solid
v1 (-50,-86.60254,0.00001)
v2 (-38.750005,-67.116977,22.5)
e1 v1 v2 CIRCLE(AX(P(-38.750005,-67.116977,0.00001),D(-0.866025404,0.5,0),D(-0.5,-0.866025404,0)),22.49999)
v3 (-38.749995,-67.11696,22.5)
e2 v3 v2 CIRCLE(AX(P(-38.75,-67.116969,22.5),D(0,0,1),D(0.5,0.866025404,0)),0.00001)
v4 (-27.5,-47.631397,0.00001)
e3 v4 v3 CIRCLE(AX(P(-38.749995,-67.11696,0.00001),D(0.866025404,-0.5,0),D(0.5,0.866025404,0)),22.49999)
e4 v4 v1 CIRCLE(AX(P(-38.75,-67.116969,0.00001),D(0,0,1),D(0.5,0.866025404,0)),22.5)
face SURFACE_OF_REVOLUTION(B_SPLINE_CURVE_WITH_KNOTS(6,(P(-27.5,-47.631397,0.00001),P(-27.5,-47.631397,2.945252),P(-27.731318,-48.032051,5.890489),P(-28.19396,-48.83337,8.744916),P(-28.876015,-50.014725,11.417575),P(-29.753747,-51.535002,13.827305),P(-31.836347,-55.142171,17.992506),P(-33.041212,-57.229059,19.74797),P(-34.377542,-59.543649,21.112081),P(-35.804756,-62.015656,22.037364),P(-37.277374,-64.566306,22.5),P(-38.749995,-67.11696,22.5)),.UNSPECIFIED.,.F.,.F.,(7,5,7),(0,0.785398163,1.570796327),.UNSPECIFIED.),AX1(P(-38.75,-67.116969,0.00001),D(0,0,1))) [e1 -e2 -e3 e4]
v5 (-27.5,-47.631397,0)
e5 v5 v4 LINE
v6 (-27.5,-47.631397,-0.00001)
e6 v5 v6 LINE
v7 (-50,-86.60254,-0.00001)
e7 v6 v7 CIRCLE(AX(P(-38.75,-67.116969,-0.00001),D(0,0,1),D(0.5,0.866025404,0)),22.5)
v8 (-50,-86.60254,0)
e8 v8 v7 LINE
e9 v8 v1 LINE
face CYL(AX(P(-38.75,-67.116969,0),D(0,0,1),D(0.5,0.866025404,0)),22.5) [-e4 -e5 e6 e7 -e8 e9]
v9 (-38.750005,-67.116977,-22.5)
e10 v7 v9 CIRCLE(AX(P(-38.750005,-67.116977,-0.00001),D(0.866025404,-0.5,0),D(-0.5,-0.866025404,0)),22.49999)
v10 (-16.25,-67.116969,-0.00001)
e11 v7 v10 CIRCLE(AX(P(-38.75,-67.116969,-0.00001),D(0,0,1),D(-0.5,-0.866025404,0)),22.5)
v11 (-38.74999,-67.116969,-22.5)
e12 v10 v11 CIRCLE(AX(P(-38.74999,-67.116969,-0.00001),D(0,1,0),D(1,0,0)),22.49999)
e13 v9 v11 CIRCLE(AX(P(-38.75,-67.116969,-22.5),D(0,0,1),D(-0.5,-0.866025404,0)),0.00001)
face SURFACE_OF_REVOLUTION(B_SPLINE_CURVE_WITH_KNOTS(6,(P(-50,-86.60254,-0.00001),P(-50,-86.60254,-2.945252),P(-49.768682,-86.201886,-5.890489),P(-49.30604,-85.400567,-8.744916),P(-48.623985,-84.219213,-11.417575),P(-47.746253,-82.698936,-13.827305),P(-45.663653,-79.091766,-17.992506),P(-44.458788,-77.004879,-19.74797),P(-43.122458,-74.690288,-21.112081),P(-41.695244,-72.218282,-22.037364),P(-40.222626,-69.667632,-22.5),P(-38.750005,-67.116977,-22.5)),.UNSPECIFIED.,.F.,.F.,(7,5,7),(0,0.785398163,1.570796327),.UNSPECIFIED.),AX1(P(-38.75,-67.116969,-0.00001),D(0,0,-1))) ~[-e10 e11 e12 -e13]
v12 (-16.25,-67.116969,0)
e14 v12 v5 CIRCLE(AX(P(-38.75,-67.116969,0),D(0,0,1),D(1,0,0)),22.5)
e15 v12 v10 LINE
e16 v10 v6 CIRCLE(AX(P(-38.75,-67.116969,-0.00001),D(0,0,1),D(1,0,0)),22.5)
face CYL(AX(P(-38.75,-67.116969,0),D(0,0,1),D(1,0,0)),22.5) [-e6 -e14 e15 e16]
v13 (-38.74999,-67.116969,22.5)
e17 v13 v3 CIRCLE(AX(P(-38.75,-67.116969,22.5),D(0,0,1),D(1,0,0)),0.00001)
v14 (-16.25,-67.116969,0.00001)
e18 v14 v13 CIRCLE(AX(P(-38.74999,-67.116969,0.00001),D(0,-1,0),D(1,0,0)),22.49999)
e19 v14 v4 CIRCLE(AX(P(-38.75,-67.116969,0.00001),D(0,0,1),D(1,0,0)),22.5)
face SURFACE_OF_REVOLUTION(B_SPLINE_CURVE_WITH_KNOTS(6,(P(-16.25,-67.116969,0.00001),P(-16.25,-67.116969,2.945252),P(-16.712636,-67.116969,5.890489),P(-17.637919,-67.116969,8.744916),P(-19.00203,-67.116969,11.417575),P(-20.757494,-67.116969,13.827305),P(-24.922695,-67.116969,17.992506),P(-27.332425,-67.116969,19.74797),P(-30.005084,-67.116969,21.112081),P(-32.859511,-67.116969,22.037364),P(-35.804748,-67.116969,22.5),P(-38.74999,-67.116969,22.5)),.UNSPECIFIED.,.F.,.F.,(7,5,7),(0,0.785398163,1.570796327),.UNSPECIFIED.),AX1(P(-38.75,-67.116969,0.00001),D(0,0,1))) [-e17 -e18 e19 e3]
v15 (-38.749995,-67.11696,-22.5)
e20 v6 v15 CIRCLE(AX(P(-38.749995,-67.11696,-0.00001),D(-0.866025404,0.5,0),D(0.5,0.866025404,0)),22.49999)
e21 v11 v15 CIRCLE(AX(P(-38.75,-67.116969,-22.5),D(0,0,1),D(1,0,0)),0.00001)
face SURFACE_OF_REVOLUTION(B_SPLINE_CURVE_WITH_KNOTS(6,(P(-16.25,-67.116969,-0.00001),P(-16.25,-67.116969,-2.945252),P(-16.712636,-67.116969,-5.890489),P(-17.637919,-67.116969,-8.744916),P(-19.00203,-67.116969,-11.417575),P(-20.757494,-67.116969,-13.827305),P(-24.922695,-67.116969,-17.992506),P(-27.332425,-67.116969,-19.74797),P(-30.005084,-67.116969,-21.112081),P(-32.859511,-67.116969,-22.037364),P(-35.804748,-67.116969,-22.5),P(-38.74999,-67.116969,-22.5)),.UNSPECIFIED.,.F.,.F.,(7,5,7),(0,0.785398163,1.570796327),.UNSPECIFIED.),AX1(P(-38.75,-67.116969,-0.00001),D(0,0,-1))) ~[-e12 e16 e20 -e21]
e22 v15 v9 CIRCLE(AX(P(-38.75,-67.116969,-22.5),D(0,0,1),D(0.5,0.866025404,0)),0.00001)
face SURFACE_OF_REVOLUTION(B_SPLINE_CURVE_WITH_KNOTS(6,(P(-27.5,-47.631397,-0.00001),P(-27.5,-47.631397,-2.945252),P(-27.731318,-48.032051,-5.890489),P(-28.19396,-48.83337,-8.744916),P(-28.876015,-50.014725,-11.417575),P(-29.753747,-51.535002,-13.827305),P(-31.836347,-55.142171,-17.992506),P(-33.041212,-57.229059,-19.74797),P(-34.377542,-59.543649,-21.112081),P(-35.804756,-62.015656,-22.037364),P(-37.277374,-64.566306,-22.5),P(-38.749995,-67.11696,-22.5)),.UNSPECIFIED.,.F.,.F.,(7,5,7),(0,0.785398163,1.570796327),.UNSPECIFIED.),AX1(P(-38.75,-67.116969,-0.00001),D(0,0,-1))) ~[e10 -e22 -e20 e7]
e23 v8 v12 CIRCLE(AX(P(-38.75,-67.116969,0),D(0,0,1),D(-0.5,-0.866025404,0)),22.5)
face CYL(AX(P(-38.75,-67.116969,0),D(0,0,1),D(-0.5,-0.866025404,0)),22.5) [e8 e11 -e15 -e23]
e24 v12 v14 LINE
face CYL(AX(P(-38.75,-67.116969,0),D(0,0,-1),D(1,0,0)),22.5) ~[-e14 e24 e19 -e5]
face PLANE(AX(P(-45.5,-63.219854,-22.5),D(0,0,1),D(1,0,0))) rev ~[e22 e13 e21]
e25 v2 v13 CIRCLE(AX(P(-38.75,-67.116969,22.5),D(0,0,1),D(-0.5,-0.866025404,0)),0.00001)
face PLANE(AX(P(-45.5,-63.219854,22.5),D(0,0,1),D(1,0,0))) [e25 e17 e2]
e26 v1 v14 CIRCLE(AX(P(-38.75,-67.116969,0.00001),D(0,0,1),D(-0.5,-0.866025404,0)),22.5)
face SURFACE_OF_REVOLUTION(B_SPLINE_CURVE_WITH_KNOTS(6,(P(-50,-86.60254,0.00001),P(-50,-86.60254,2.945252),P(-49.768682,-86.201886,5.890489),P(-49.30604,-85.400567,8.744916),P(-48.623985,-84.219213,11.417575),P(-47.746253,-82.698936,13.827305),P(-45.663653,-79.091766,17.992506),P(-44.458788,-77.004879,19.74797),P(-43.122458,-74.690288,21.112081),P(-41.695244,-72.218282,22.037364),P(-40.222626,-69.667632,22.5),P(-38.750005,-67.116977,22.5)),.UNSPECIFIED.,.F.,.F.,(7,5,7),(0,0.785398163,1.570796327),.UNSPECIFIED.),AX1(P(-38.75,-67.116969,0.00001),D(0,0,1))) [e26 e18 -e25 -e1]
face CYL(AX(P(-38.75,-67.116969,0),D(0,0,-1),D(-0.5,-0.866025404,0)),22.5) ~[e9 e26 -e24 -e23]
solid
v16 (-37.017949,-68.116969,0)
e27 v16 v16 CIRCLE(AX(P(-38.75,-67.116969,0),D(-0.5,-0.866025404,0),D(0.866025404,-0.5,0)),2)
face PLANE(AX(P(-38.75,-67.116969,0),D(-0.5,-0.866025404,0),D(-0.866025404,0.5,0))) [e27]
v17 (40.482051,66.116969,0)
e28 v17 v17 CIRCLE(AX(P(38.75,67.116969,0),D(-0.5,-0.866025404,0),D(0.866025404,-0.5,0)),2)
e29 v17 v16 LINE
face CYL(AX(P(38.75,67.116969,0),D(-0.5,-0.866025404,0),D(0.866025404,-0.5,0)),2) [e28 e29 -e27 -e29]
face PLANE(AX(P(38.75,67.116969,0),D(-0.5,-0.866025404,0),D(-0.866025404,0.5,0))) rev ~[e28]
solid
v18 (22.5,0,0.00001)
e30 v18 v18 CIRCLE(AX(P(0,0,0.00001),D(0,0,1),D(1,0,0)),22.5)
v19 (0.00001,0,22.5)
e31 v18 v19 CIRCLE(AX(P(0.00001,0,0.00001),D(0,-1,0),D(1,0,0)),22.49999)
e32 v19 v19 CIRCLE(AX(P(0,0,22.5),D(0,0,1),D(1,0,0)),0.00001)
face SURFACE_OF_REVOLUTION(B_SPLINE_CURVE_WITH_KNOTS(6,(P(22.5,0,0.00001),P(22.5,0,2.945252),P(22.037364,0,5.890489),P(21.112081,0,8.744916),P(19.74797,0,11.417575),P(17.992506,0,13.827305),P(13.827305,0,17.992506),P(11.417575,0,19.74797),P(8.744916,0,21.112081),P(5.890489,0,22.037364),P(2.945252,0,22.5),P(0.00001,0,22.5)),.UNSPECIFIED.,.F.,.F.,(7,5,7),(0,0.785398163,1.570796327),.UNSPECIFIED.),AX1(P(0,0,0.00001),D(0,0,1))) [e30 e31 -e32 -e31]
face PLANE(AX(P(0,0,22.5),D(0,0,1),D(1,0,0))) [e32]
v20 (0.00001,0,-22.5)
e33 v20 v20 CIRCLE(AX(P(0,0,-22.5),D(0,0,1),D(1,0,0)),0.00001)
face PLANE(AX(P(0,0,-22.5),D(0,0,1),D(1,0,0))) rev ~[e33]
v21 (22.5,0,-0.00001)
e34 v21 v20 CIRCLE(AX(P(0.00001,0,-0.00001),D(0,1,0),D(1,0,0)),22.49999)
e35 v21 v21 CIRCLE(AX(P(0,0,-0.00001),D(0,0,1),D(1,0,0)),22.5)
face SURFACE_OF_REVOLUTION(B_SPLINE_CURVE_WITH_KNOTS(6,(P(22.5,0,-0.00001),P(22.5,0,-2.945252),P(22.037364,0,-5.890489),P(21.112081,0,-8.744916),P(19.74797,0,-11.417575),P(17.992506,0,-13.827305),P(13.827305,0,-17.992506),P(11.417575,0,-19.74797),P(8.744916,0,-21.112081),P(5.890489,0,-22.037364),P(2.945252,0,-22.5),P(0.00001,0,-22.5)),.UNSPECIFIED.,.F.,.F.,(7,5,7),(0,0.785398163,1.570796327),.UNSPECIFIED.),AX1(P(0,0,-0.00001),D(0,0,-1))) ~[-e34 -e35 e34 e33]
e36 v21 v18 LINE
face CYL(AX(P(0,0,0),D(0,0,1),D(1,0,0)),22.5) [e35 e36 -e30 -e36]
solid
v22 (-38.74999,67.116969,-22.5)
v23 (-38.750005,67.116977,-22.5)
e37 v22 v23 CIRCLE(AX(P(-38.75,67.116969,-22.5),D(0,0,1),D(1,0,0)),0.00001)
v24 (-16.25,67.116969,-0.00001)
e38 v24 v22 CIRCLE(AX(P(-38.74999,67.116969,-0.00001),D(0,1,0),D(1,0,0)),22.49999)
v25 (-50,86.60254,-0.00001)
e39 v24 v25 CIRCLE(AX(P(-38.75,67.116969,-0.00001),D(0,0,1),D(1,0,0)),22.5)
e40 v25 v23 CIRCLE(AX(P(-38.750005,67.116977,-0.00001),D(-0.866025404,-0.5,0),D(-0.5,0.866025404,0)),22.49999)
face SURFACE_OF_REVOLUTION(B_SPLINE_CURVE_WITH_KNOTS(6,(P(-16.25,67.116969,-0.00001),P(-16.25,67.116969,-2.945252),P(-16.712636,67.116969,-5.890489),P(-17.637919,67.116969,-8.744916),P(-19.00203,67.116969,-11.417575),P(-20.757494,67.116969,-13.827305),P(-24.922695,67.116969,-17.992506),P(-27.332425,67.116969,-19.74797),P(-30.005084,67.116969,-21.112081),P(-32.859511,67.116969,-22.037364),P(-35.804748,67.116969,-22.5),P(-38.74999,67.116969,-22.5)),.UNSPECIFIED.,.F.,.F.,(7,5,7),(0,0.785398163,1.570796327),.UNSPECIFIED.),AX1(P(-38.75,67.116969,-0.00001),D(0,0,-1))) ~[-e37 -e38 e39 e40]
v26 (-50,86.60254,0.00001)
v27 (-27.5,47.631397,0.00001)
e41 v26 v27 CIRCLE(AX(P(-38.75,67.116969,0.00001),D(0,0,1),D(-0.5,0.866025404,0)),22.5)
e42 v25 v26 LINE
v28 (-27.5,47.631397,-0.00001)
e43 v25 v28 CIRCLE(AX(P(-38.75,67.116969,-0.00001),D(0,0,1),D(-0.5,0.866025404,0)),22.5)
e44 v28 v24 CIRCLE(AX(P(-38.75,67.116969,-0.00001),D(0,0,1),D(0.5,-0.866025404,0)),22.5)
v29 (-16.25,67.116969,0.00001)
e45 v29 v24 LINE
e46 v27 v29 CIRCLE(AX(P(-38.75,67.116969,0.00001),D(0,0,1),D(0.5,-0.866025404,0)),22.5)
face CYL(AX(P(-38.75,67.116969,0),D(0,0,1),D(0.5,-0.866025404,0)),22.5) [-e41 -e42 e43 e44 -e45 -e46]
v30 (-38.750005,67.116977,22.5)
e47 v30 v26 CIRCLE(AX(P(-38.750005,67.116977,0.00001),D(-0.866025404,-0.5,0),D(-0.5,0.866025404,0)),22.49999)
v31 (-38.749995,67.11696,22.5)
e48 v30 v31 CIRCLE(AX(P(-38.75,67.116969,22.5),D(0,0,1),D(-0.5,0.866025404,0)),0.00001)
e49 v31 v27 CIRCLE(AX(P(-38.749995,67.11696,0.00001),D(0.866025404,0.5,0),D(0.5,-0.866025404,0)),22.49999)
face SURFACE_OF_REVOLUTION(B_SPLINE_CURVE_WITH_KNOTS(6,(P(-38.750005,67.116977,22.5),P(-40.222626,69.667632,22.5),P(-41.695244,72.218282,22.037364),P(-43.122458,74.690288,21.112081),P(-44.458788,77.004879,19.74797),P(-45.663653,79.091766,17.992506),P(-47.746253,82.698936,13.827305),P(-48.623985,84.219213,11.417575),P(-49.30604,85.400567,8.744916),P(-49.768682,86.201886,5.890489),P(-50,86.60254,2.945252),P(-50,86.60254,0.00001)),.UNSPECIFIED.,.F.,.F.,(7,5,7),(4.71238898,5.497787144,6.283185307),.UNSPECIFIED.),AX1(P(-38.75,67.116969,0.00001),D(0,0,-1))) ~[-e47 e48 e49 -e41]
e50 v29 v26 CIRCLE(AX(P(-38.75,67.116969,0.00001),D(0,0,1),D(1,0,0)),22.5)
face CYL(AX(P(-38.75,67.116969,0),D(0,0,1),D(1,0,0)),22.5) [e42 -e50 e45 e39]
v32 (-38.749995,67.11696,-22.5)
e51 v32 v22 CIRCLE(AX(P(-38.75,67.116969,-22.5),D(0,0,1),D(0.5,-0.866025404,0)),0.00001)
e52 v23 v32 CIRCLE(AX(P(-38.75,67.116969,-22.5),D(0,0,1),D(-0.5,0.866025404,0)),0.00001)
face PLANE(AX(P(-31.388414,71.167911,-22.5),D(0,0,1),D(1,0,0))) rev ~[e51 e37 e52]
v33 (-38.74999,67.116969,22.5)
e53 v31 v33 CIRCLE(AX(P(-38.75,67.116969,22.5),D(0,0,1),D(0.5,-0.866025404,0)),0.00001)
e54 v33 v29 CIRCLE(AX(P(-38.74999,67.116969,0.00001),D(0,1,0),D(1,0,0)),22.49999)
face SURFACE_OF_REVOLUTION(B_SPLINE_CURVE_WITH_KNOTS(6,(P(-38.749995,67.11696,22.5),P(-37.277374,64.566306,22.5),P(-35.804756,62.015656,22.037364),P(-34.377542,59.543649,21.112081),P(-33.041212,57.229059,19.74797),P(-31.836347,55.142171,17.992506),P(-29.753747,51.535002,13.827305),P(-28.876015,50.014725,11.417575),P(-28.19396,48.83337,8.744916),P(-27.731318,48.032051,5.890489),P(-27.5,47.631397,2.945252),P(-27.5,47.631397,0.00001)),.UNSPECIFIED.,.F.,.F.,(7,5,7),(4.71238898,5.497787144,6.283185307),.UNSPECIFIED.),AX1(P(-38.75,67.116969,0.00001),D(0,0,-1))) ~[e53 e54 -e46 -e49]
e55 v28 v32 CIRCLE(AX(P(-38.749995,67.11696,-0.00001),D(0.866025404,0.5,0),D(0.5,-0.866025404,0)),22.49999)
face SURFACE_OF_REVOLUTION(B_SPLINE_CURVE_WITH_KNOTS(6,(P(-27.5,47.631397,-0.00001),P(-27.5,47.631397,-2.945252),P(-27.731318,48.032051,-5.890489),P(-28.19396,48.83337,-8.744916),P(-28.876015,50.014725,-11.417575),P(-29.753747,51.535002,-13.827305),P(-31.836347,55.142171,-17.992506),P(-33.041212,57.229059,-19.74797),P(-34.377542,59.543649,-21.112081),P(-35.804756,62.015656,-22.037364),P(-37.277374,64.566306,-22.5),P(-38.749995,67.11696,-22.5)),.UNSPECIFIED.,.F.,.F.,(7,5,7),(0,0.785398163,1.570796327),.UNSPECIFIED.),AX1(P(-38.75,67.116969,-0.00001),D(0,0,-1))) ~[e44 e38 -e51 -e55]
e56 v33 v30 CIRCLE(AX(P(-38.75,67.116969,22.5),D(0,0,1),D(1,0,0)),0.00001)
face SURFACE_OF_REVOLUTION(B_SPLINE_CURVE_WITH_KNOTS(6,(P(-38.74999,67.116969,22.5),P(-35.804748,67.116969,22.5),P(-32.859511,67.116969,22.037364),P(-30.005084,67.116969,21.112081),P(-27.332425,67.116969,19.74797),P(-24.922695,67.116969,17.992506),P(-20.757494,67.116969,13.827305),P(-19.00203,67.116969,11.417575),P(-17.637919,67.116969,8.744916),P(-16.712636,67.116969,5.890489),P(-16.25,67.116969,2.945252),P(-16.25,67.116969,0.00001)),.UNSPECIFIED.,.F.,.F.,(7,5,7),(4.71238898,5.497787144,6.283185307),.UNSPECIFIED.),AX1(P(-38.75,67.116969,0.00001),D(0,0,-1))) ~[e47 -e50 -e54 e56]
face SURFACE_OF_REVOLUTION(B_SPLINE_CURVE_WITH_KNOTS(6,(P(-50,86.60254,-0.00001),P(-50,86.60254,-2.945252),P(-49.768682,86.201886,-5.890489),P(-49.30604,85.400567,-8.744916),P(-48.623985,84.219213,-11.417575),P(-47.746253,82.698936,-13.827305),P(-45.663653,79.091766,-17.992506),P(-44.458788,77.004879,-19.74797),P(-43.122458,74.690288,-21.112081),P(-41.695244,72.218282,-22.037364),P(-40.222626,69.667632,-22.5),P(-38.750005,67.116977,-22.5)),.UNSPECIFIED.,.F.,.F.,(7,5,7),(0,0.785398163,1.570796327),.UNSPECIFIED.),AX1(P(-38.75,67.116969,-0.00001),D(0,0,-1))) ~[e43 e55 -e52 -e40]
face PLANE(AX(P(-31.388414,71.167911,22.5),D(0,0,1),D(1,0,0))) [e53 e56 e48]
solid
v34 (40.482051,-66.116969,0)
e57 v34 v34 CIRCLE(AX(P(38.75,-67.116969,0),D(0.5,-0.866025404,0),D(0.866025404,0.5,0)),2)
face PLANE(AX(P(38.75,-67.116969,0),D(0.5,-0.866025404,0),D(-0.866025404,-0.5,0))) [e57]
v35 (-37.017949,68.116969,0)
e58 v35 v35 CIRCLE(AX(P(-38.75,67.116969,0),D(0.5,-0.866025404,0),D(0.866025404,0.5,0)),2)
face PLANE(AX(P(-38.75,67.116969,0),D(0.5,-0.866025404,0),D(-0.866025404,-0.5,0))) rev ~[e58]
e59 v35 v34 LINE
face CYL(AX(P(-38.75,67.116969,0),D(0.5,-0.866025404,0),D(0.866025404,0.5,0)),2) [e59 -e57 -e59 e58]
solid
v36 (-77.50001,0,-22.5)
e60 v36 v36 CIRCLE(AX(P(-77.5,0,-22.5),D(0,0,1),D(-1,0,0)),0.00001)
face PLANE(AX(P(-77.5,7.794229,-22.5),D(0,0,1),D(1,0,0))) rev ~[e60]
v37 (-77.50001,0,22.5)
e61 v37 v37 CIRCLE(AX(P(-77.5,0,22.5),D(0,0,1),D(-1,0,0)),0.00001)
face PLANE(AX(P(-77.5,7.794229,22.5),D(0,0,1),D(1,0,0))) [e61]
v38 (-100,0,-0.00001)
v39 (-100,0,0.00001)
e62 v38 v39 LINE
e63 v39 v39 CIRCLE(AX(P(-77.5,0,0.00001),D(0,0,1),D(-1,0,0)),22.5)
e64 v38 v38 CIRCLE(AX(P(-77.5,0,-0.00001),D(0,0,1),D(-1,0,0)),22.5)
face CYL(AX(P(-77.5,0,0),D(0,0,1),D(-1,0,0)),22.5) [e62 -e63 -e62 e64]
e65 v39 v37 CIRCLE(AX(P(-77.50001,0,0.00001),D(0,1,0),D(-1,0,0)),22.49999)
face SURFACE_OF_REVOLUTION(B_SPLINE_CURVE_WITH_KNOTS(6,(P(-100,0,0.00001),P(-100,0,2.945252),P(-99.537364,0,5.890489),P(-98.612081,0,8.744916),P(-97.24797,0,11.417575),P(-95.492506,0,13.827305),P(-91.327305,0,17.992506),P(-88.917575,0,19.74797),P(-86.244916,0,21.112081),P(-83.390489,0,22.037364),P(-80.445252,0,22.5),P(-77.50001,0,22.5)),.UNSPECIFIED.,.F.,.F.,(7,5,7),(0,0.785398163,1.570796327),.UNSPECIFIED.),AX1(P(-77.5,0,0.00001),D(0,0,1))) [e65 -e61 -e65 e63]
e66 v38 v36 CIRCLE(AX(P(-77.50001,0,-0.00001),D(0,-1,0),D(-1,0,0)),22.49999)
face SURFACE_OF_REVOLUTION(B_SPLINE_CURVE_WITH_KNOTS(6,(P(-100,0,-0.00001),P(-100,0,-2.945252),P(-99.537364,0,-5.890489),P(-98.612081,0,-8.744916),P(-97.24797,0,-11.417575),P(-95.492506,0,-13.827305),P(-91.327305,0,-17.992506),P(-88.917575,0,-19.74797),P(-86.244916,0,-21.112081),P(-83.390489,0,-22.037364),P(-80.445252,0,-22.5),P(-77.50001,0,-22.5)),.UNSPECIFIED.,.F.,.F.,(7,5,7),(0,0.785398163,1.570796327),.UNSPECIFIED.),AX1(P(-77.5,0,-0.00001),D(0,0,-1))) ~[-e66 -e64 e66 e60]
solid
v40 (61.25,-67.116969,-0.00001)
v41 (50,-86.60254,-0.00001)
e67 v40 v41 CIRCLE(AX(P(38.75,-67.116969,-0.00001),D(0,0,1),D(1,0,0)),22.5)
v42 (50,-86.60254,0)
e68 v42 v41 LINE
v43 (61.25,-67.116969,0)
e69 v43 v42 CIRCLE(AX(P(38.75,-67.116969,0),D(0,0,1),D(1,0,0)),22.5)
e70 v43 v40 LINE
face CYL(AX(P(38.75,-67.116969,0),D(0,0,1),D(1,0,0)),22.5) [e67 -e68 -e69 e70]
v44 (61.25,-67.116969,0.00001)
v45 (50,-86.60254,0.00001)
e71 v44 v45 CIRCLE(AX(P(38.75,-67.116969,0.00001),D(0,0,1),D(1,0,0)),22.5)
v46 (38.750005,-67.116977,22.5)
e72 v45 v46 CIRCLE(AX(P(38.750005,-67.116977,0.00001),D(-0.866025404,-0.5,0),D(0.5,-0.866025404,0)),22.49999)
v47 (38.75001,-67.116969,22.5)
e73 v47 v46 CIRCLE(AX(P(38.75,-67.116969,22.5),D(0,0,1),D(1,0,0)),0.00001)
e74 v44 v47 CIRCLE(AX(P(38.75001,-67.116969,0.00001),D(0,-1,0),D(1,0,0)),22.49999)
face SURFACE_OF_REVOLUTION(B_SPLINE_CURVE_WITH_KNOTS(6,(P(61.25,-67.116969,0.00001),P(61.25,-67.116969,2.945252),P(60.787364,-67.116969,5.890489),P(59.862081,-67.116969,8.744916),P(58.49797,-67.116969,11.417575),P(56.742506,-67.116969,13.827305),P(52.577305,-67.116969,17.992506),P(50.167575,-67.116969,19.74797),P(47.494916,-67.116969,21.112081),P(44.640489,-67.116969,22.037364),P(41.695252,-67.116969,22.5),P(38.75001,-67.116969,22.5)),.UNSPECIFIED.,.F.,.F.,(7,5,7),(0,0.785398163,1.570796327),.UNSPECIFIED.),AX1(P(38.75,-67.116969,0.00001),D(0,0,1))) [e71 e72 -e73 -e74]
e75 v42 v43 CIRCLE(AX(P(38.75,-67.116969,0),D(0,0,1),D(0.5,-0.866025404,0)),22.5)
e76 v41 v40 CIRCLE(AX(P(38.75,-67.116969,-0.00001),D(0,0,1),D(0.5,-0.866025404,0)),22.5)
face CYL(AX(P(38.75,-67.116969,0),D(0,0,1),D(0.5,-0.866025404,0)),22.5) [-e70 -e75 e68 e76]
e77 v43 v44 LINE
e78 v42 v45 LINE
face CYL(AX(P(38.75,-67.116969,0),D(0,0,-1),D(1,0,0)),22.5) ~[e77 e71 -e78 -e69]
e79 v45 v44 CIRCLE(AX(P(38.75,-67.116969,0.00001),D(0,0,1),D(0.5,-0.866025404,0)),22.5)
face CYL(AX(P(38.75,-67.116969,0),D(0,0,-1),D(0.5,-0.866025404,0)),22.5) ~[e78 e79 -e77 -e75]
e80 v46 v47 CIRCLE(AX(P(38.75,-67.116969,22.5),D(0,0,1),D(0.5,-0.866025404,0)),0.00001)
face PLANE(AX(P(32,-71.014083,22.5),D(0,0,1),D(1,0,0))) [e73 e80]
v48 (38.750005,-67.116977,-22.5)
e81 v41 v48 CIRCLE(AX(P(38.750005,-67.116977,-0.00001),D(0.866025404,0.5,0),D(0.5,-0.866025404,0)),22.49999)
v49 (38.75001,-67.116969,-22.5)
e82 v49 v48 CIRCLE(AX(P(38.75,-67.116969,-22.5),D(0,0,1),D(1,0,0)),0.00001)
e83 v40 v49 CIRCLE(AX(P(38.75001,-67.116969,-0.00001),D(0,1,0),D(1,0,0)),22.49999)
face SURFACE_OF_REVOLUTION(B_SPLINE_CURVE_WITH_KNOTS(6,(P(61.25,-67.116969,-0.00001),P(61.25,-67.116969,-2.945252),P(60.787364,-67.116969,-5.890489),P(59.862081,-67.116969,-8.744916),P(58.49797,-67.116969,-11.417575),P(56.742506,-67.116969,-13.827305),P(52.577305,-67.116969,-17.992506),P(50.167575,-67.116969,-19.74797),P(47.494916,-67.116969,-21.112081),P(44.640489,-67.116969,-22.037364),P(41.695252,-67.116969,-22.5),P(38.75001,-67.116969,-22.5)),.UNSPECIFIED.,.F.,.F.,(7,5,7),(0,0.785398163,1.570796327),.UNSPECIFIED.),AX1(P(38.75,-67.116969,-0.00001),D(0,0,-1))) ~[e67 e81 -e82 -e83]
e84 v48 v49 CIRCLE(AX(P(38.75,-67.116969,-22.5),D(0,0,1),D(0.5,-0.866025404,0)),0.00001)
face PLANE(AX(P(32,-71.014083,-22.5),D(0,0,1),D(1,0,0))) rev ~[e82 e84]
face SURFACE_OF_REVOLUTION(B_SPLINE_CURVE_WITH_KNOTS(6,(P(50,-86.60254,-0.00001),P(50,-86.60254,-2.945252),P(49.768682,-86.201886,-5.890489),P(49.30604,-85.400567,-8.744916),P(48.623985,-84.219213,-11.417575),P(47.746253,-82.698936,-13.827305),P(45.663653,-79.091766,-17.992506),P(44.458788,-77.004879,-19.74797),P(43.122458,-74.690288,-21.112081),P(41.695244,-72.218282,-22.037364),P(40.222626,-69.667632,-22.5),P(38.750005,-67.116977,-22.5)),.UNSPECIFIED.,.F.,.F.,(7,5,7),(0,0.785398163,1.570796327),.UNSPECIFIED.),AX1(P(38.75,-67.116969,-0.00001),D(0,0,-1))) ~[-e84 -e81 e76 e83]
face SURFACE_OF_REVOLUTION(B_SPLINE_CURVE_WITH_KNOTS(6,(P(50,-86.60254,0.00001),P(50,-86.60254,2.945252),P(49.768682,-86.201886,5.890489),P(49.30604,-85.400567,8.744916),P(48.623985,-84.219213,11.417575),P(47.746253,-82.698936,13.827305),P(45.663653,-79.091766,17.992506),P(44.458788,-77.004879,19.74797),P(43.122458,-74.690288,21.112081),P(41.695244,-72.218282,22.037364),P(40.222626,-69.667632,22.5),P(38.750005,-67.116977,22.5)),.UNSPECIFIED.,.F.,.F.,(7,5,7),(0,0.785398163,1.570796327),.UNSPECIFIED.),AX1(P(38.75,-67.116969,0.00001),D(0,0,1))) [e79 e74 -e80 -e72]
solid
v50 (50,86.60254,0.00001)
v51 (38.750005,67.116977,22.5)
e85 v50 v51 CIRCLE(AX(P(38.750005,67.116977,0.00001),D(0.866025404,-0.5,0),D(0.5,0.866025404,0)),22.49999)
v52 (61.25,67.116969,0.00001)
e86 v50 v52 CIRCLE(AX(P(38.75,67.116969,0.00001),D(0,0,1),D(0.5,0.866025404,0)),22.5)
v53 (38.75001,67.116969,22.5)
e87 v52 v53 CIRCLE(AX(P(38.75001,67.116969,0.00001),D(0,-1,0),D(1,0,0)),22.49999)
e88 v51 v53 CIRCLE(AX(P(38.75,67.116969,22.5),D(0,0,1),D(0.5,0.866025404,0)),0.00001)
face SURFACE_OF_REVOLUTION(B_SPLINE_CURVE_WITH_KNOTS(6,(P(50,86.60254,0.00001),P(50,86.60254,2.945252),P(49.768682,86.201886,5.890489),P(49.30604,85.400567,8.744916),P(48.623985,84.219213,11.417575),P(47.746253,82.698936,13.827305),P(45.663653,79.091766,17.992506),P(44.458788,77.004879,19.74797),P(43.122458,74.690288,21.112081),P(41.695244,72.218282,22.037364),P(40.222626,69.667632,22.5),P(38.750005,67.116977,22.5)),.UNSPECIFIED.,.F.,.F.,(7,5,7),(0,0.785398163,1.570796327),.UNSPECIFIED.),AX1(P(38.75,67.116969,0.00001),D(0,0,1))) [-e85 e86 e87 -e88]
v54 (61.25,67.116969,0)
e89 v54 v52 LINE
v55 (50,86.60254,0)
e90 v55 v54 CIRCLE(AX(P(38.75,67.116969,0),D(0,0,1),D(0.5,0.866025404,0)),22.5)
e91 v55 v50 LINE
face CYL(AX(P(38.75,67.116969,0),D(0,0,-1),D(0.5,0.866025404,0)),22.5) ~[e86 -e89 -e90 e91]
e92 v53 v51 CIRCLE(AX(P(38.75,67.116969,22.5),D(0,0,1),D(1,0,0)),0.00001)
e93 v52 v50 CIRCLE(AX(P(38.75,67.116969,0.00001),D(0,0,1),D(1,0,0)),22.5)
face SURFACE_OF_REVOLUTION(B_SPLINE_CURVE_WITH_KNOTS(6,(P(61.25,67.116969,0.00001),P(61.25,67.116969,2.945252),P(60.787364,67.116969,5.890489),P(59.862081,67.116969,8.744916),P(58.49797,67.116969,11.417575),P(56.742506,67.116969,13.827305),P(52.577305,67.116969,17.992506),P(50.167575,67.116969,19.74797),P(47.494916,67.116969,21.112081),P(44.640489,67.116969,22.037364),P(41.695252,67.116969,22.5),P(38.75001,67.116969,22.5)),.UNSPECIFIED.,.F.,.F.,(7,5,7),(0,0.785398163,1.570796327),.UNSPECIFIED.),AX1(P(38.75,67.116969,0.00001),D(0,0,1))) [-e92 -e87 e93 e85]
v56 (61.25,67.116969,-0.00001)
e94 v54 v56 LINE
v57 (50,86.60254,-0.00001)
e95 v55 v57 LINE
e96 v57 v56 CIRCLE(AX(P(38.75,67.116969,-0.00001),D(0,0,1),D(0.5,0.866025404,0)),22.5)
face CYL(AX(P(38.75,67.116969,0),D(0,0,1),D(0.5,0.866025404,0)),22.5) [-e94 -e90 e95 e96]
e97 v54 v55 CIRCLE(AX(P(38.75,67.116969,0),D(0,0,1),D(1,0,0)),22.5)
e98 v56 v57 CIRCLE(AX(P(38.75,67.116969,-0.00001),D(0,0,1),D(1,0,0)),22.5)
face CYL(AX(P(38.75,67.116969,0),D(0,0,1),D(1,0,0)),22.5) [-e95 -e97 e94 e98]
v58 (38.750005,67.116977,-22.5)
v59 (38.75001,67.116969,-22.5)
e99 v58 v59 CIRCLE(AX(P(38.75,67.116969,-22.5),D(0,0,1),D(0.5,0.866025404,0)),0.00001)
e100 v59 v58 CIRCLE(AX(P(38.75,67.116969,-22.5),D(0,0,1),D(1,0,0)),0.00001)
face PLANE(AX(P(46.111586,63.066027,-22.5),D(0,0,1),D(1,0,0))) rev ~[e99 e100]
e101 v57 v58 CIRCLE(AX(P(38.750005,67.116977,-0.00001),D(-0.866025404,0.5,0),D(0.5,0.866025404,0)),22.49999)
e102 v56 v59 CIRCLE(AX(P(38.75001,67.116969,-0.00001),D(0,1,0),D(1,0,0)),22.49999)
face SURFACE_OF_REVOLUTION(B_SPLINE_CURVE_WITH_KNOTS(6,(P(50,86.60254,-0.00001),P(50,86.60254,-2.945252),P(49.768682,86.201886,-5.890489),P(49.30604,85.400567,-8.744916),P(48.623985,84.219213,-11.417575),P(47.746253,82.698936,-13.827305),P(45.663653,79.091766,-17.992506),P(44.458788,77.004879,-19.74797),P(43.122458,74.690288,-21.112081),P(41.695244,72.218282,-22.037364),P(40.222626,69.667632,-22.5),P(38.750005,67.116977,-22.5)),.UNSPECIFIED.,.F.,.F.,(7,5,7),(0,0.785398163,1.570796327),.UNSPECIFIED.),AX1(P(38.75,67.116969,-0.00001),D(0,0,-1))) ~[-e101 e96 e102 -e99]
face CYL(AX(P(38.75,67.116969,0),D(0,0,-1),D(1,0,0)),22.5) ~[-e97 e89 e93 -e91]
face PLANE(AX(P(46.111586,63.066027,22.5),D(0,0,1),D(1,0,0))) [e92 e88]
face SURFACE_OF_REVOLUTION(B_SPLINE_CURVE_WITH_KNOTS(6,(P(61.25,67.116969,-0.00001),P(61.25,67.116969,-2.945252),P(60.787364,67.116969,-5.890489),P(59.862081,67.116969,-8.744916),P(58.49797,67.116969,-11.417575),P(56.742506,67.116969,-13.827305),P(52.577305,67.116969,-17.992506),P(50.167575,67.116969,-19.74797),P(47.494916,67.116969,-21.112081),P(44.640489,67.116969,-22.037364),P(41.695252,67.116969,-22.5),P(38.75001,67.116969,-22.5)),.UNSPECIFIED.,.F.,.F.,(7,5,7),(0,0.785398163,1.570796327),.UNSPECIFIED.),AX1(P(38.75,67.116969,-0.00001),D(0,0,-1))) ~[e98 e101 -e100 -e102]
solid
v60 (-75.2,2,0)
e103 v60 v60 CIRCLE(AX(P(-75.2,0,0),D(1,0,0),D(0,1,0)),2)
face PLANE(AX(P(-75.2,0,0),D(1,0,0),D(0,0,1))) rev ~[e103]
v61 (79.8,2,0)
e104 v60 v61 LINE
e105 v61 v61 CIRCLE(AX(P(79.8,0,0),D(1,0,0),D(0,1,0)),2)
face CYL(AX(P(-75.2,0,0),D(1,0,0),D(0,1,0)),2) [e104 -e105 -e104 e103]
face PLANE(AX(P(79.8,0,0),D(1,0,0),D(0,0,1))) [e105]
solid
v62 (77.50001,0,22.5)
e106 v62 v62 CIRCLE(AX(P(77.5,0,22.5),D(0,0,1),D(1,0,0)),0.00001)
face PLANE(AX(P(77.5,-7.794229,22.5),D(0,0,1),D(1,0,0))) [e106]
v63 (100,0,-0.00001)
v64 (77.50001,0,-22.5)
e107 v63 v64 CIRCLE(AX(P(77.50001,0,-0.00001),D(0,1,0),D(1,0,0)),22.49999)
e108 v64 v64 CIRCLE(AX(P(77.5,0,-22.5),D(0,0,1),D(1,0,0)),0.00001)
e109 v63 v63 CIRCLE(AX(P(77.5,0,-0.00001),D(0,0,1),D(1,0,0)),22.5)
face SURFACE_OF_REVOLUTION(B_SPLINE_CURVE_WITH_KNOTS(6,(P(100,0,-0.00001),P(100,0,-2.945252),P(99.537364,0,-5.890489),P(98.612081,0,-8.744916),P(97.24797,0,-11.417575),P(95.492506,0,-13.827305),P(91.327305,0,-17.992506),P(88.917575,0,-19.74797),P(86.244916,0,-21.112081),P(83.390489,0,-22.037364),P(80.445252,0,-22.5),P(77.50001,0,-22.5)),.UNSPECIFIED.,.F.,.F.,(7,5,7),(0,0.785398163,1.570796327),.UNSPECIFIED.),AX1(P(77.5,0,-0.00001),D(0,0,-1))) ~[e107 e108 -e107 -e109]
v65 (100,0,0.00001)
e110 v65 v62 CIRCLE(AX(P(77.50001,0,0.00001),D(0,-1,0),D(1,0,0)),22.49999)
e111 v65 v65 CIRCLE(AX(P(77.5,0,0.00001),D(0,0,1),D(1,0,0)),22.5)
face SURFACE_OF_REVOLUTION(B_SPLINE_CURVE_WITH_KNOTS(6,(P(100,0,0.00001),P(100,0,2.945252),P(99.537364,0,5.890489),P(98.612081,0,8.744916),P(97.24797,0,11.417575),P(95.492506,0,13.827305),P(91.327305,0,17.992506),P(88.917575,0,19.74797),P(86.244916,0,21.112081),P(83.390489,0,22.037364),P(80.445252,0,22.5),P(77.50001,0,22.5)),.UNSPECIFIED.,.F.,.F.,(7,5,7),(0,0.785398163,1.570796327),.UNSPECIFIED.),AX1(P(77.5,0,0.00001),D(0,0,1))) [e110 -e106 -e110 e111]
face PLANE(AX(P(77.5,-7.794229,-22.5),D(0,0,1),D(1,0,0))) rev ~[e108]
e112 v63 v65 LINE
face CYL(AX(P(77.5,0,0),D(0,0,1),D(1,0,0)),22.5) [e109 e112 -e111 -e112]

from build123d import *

# Parameters (mm, degrees)
F1_DEPTH = 22.5
F0_R     = 22.5
F2_R     = 22.49999
F2_2_R   = 22.49999
F2_3_R   = 22.49999
F2_4_R   = 22.49999
F2_5_R   = 22.49999
F2_6_R   = 22.49999
F2_7_R   = 22.49999
F5_R     = 2
F8_R     = 2
F11_R    = 2


# Not quite as in the source:
# - a fillet or chamfer is up to 0.001 mm smaller than in the source, because OpenCascade refuses the exact size
# - a feature names something its author has since deleted; it is built from what else it names


with BuildPart() as f1:
    # F0 (on Top) → F1 (new body, symmetric)
    with BuildSketch(Plane.XY):
        with BuildLine():
            ThreePointArc((55, 0), (77.5, -22.5), (100, 0))
            Line((100, 0), (55, 0))
        make_face()
        with BuildLine():
            Line((55, 0), (100, 0))
            ThreePointArc((100, 0), (77.5, 22.5), (55, 0))
        make_face()
    extrude(amount=F1_DEPTH, both=True)

    # F2#5 (radius 22.5 in the source; OpenCascade refuses exactly that, so slightly less here)
    f2_5_edges = [f1.edges().sort_by_distance(p)[0] for p in [
        (55, 0, 22.5),
        (55, 0, -22.5),
    ]]
    fillet(f2_5_edges, radius=F2_5_R)


with BuildPart() as f1b:
    # F0 (on Top) → F1, piece 2 (new body, symmetric)
    with BuildSketch(Plane.XY):
        Circle(F0_R)
    extrude(amount=F1_DEPTH, both=True)

    # F2 (radius 22.5 in the source; OpenCascade refuses exactly that, so slightly less here)
    f2_edges = [f1b.edges().sort_by_distance(p)[0] for p in [
        (-22.5, 0, 22.5),
        (-22.5, 0, -22.5),
    ]]
    fillet(f2_edges, radius=F2_R)


with BuildPart() as f1c:
    # F0 (on Top) → F1, piece 3 (new body, symmetric)
    with BuildSketch(Plane.XY):
        with BuildLine():
            ThreePointArc((61.25, 67.1169687933), (58.2355715851, 78.3669687933), (50, 86.6025403784))
            Line((50, 86.6025403784), (27.5, 47.6313972081))
            ThreePointArc((27.5, 47.6313972081), (50, 47.6313972081), (61.25, 67.1169687933))
        make_face()
        with BuildLine():
            Line((27.5, 47.6313972081), (50, 86.6025403784))
            ThreePointArc((50, 86.6025403784), (19.2644284149, 78.3669687933), (27.5, 47.6313972081))
        make_face()
    extrude(amount=F1_DEPTH, both=True)

    # F2#4 (radius 22.5 in the source; OpenCascade refuses exactly that, so slightly less here)
    f2_4_edges = [f1c.edges().sort_by_distance(p)[0] for p in [
        (16.25, 67.116969, 22.5),
        (16.25, 67.116969, -22.5),
    ]]
    fillet(f2_4_edges, radius=F2_4_R)


with BuildPart() as f1d:
    # F0 (on Top) → F1, piece 4 (new body, symmetric)
    with BuildSketch(Plane.XY):
        with BuildLine():
            ThreePointArc((-16.25, 67.1169687933), (-27.5, 86.6025403784), (-50, 86.6025403784))
            Line((-50, 86.6025403784), (-27.5, 47.6313972081))
            ThreePointArc((-27.5, 47.6313972081), (-19.2644284149, 55.8669687933), (-16.25, 67.1169687933))
        make_face()
        with BuildLine():
            Line((-27.5, 47.6313972081), (-50, 86.6025403784))
            ThreePointArc((-50, 86.6025403784), (-58.2355715851, 55.8669687933), (-27.5, 47.6313972081))
        make_face()
    extrude(amount=F1_DEPTH, both=True)

    # F2#3 (radius 22.5 in the source; OpenCascade refuses exactly that, so slightly less here)
    f2_3_edges = [f1d.edges().sort_by_distance(p)[0] for p in [
        (-61.25, 67.116969, 22.5),
        (-61.25, 67.116969, -22.5),
    ]]
    fillet(f2_3_edges, radius=F2_3_R)


with BuildPart() as f1e:
    # F0 (on Top) → F1, piece 5 (new body, symmetric)
    with BuildSketch(Plane.XY):
        with BuildLine():
            ThreePointArc((27.5, -47.6313972081), (19.2644284149, -78.3669687933), (50, -86.6025403784))
            Line((50, -86.6025403784), (27.5, -47.6313972081))
        make_face()
        with BuildLine():
            Line((27.5, -47.6313972081), (50, -86.6025403784))
            ThreePointArc((50, -86.6025403784), (58.2355715851, -78.3669687933), (61.25, -67.1169687933))
            ThreePointArc((61.25, -67.1169687933), (50, -47.6313972081), (27.5, -47.6313972081))
        make_face()
    extrude(amount=F1_DEPTH, both=True)

    # F2#6 (radius 22.5 in the source; OpenCascade refuses exactly that, so slightly less here)
    f2_6_edges = [f1e.edges().sort_by_distance(p)[0] for p in [
        (27.5, -47.631397, 22.5),
        (27.5, -47.631397, -22.5),
    ]]
    fillet(f2_6_edges, radius=F2_6_R)


with BuildPart() as f1f:
    # F0 (on Top) → F1, piece 6 (new body, symmetric)
    with BuildSketch(Plane.XY):
        with BuildLine():
            ThreePointArc((-27.5, -47.6313972081), (-58.2355715851, -55.8669687933), (-50, -86.6025403784))
            Line((-50, -86.6025403784), (-27.5, -47.6313972081))
        make_face()
        with BuildLine():
            Line((-27.5, -47.6313972081), (-50, -86.6025403784))
            ThreePointArc((-50, -86.6025403784), (-27.5, -86.6025403784), (-16.25, -67.1169687933))
            ThreePointArc((-16.25, -67.1169687933), (-19.2644284149, -55.8669687933), (-27.5, -47.6313972081))
        make_face()
    extrude(amount=F1_DEPTH, both=True)

    # F2#7 (radius 22.5 in the source; OpenCascade refuses exactly that, so slightly less here)
    f2_7_edges = [f1f.edges().sort_by_distance(p)[0] for p in [
        (-27.5, -47.631397, 22.5),
        (-27.5, -47.631397, -22.5),
    ]]
    fillet(f2_7_edges, radius=F2_7_R)


with BuildPart() as f1g:
    # F0 (on Top) → F1, piece 7 (new body, symmetric)
    with BuildSketch(Plane.XY):
        with BuildLine():
            ThreePointArc((-55, 0), (-77.5, 22.5), (-100, 0))
            Line((-100, 0), (-55, 0))
        make_face()
        with BuildLine():
            Line((-55, 0), (-100, 0))
            ThreePointArc((-100, 0), (-77.5, -22.5), (-55, 0))
        make_face()
    extrude(amount=F1_DEPTH, both=True)

    # F2#2 (radius 22.5 in the source; OpenCascade refuses exactly that, so slightly less here)
    f2_2_edges = [f1g.edges().sort_by_distance(p)[0] for p in [
        (-55, 0, 22.5),
        (-55, 0, -22.5),
    ]]
    fillet(f2_2_edges, radius=F2_2_R)


with BuildPart() as f6:
    # F6: sweep along a path in F4
    with BuildLine(Plane.XY) as f6_path:
        Line((-77.5, 0), (77.5, 0))
    # F5 (on offset) → F6 (sweep)
    with BuildSketch(Plane.YZ.offset(79.8)):
        Circle(F5_R)
    sweep(path=f6_path.line)


with BuildPart() as f9:
    # F9: sweep along a path in F4
    with BuildLine(Plane.XY) as f9_path:
        Line((-38.75, 67.1169687933), (38.75, -67.1169687933))
    # F8 (on line) → F9 (sweep)
    with BuildSketch(Plane(origin=(-38.75, 67.1169687933, 0), x_dir=(0.8660254038, 0.5, 0), z_dir=(0.5, -0.8660254038, 0))):
        Circle(F8_R)
    sweep(path=f9_path.line)


with BuildPart() as f12:
    # F12: sweep along a path in F4
    with BuildLine(Plane.XY) as f12_path:
        Line((38.75, 67.1169687933), (-38.75, -67.1169687933))
    # F11 (on line) → F12 (sweep)
    with BuildSketch(Plane(origin=(38.75, 67.1169687933, 0), x_dir=(0.8660254038, -0.5, 0), z_dir=(-0.5, -0.8660254038, 0))):
        Circle(F11_R)
    sweep(path=f12_path.line)


solid = Compound([f1.part, f1b.part, f1c.part, f1d.part, f1e.part, f1f.part, f1g.part, f6.part, f9.part, f12.part])
